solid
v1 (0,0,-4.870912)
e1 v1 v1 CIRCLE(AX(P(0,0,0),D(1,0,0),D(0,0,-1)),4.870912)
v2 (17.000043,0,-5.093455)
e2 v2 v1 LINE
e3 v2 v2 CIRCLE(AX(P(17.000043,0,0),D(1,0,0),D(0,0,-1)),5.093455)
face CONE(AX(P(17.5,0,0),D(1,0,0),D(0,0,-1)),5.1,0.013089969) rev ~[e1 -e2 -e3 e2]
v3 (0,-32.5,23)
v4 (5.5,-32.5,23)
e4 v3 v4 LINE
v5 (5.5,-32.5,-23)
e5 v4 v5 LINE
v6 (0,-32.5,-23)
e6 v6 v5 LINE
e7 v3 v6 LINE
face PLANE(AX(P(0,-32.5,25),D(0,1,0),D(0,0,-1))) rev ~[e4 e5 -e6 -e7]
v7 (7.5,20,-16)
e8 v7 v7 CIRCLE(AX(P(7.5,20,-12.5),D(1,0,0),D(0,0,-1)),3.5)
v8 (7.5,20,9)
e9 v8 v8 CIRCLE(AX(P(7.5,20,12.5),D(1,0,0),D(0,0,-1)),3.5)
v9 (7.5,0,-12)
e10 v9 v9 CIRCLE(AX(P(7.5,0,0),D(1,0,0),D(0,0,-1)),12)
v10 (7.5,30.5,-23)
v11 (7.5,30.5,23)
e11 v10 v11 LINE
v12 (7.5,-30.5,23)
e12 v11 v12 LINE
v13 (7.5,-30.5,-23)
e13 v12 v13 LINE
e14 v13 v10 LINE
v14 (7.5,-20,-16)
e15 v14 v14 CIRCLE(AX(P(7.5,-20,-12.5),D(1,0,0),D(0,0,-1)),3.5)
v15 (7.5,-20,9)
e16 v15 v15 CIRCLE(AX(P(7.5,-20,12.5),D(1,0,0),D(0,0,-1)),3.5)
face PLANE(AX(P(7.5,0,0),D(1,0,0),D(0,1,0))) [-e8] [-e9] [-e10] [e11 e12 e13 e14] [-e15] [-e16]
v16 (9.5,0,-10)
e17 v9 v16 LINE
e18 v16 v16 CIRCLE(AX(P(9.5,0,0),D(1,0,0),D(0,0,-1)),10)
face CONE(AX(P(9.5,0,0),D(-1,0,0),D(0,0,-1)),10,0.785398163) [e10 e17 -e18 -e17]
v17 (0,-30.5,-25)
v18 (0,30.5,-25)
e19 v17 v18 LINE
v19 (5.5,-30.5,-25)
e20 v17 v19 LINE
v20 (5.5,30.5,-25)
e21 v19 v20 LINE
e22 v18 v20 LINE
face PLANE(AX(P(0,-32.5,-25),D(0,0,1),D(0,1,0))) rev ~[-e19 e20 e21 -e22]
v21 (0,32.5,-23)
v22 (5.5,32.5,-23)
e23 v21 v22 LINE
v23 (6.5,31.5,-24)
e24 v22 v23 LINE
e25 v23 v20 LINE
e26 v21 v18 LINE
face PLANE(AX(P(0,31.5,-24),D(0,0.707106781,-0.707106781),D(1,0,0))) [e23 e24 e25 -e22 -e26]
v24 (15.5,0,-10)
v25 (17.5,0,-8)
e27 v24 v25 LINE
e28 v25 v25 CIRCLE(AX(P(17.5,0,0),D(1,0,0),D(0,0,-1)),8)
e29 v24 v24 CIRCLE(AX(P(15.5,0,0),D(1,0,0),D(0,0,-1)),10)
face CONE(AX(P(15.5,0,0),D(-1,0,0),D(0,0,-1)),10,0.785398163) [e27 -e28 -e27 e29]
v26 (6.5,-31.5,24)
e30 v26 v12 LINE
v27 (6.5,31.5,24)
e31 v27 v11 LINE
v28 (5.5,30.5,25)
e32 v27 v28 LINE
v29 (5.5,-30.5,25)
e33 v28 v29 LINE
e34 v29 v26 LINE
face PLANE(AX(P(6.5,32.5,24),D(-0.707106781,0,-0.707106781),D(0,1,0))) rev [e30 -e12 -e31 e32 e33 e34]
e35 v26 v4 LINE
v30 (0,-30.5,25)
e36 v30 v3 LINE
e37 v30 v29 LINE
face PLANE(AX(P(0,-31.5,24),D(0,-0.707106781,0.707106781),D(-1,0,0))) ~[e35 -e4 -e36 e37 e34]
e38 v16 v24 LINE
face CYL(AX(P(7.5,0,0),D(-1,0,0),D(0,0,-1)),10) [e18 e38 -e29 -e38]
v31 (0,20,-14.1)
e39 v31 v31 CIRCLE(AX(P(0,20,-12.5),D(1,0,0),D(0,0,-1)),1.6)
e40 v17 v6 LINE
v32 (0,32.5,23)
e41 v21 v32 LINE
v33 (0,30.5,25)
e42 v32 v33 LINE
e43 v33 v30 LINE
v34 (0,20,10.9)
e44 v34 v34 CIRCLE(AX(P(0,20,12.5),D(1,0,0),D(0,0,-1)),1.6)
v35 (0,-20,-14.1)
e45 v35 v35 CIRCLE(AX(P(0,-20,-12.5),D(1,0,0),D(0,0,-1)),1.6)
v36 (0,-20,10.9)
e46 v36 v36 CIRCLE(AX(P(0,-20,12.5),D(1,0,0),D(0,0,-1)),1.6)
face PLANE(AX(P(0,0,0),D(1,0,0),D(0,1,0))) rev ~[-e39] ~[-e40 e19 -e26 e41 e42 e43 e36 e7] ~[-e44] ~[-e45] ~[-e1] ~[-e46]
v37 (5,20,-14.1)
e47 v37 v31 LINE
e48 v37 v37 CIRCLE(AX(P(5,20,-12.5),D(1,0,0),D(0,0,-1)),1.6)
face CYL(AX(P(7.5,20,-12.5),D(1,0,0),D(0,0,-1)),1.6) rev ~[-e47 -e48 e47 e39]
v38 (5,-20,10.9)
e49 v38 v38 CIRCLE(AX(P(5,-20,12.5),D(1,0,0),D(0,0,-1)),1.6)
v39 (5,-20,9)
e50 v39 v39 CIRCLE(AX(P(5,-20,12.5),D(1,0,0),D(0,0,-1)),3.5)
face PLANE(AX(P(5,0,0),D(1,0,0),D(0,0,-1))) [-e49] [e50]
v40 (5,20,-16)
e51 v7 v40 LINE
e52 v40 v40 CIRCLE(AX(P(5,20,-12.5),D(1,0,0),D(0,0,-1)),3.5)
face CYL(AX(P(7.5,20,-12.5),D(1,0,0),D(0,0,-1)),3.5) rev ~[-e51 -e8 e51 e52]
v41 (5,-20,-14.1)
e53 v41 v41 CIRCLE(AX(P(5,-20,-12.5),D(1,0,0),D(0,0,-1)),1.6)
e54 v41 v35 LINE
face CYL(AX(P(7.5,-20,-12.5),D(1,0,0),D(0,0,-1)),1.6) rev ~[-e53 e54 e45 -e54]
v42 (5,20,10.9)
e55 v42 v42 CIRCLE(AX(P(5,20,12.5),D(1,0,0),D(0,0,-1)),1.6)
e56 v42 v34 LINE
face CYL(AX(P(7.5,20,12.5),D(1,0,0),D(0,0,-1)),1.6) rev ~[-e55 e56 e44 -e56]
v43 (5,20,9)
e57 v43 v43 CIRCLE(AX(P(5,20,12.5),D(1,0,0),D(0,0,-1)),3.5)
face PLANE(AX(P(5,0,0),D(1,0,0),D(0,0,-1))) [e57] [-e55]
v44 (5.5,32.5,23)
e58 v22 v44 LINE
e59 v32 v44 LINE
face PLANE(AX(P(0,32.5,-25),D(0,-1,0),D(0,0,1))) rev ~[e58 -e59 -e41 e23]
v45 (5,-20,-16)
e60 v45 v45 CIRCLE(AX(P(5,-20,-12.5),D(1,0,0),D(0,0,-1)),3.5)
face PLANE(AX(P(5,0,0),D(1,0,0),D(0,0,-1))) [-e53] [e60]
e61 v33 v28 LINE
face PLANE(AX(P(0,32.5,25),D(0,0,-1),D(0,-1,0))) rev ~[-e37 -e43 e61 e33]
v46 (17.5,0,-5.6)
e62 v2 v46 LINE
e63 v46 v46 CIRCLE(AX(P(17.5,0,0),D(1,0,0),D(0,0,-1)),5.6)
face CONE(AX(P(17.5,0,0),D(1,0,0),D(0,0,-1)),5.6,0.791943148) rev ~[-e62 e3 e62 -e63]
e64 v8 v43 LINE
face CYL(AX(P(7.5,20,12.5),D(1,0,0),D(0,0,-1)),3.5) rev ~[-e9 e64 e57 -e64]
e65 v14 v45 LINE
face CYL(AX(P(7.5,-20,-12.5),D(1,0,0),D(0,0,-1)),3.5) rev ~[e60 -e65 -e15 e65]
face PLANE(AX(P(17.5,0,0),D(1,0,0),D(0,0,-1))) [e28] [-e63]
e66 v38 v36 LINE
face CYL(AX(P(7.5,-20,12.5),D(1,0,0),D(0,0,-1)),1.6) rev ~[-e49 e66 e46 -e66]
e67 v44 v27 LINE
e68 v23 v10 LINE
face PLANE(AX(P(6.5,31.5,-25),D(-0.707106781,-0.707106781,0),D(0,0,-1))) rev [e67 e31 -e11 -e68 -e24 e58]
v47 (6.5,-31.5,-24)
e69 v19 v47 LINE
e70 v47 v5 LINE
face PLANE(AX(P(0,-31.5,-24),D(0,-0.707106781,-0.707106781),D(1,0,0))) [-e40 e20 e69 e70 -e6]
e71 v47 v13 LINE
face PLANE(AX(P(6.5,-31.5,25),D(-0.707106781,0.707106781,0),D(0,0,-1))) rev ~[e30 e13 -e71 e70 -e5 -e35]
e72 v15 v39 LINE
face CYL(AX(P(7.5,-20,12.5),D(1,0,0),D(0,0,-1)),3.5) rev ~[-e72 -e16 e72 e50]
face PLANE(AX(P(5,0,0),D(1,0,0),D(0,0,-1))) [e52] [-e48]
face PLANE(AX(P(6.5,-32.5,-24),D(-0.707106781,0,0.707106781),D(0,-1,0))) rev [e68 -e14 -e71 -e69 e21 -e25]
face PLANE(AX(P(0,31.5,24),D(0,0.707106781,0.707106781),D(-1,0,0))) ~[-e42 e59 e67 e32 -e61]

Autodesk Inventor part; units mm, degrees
ref_plane "YZ Plane" through (0, 0, 0) normal (1, 0, 0) x (0, 1, 0)
ref_plane "XZ Plane" through (0, 0, 0) normal (0, 1, 0) x (-1, 0, 0)
ref_plane "XY Plane" through (0, 0, 0) normal (0, 0, 1) x (1, 0, 0)
sketch "Sketch1" plane through (0, 0, 0) normal (1, 0, 0) x (0, 1, 0)
  line L0 (32.5, 25) -> (-32.5, 25)
  line L1 (-32.5, 25) -> (-32.5, -25)
  line L2 (-32.5, -25) -> (32.5, -25)
  line L3 (32.5, -25) -> (32.5, 25)
  point P0 (0, 0)
  dimension "d0" = 65
  dimension "d1" = 50
  dimension "d2" = 32.5
  dimension "d3" = 25
extrude "Extrusion1" add sketch "Sketch1" along normal blind 7.5
sketch "Sketch2" plane through (7.5, 0, 0) normal (1, 0, 0) x (0, 0, -1)
  circle A0 centre (-12.5, 20) radius 1.6
  line L0 (25, 32.5) -> (-25, 32.5) projected
  line L1 (-25, 32.5) -> (-25, -32.5) projected
  circle A1 centre (12.5, 20) radius 1.6
  line L2 (25, -32.5) -> (25, 32.5) projected
  point P0 (0, 0)
  dimension "d6" = 3.2
  dimension "d7" = 12.5
  dimension "d8" = 12.5
  dimension "d9" = 3.2
  dimension "d10" = 12.5
  dimension "d11" = 12.5
extrude "Extrusion2" cut sketch "Sketch2" against normal through all
sketch "Sketch3" plane through (7.5, 0, 0) normal (1, 0, 0) x (0, 0, -1)
  circle A0 centre (0, 0) radius 10
  dimension "d14" = 20
extrude "Extrusion3" add sketch "Sketch3" along normal blind 10
sketch "Sketch4" plane through (17.5, 0, 0) normal (1, 0, 0) x (0, 0, -1)
  circle A0 centre (0, 0) radius 5.1
  dimension "d17" = 10.2
extrude "Extrusion4" cut sketch "Sketch4" against normal through all draft -0.75
chamfer "Chamfer1" distance 2 angle 45 6 edges at (7.5, 0, 10) (17.5, 0, 10) (7.5, 0, 25) (7.5, 32.5, 0) (7.5, 0, -25) (7.5, -32.5, 0)
chamfer "Chamfer2" distance 0.5 angle 45 1 edges at (17.5, 0, 5.1)
mirror "Mirror1" about plane through (0, 0, 0) normal (0, 1, 0) of "Extrusion2"
chamfer "Chamfer3" distance 2 angle 45 4 edges at (2.75, 32.5, 25) (2.75, 32.5, -25) (2.75, -32.5, 25) (2.75, -32.5, -25)
sketch "Sketch5" plane through (7.5, 0, 0) normal (1, 0, 0) x (0, 0, -1)
  circle A0 centre (-12.5, 20) radius 1.6 projected
  circle A1 centre (-12.5, 20) radius 3.5
  circle A2 centre (12.5, 20) radius 1.6 projected
  circle A3 centre (12.5, 20) radius 3.5
  circle A4 centre (12.5, -20) radius 1.6 projected
  circle A5 centre (12.5, -20) radius 3.5
  circle A6 centre (-12.5, -20) radius 1.6 projected
  circle A7 centre (-12.5, -20) radius 3.5
  point P0 (0, 0)
  dimension "d29" = 7
  dimension "d30" = 7
  dimension "d31" = 7
  dimension "d32" = 7
extrude "Extrusion5" cut sketch "Sketch5" against normal blind 2.5 contours A0 | A1 | A2 | A3 | A4 | A5 | A6 | A7
equation "\"d2\" = 0.5 * d0"
equation "\"d3\" = 0.5 * d1"
properties part number "Front_Cover"
